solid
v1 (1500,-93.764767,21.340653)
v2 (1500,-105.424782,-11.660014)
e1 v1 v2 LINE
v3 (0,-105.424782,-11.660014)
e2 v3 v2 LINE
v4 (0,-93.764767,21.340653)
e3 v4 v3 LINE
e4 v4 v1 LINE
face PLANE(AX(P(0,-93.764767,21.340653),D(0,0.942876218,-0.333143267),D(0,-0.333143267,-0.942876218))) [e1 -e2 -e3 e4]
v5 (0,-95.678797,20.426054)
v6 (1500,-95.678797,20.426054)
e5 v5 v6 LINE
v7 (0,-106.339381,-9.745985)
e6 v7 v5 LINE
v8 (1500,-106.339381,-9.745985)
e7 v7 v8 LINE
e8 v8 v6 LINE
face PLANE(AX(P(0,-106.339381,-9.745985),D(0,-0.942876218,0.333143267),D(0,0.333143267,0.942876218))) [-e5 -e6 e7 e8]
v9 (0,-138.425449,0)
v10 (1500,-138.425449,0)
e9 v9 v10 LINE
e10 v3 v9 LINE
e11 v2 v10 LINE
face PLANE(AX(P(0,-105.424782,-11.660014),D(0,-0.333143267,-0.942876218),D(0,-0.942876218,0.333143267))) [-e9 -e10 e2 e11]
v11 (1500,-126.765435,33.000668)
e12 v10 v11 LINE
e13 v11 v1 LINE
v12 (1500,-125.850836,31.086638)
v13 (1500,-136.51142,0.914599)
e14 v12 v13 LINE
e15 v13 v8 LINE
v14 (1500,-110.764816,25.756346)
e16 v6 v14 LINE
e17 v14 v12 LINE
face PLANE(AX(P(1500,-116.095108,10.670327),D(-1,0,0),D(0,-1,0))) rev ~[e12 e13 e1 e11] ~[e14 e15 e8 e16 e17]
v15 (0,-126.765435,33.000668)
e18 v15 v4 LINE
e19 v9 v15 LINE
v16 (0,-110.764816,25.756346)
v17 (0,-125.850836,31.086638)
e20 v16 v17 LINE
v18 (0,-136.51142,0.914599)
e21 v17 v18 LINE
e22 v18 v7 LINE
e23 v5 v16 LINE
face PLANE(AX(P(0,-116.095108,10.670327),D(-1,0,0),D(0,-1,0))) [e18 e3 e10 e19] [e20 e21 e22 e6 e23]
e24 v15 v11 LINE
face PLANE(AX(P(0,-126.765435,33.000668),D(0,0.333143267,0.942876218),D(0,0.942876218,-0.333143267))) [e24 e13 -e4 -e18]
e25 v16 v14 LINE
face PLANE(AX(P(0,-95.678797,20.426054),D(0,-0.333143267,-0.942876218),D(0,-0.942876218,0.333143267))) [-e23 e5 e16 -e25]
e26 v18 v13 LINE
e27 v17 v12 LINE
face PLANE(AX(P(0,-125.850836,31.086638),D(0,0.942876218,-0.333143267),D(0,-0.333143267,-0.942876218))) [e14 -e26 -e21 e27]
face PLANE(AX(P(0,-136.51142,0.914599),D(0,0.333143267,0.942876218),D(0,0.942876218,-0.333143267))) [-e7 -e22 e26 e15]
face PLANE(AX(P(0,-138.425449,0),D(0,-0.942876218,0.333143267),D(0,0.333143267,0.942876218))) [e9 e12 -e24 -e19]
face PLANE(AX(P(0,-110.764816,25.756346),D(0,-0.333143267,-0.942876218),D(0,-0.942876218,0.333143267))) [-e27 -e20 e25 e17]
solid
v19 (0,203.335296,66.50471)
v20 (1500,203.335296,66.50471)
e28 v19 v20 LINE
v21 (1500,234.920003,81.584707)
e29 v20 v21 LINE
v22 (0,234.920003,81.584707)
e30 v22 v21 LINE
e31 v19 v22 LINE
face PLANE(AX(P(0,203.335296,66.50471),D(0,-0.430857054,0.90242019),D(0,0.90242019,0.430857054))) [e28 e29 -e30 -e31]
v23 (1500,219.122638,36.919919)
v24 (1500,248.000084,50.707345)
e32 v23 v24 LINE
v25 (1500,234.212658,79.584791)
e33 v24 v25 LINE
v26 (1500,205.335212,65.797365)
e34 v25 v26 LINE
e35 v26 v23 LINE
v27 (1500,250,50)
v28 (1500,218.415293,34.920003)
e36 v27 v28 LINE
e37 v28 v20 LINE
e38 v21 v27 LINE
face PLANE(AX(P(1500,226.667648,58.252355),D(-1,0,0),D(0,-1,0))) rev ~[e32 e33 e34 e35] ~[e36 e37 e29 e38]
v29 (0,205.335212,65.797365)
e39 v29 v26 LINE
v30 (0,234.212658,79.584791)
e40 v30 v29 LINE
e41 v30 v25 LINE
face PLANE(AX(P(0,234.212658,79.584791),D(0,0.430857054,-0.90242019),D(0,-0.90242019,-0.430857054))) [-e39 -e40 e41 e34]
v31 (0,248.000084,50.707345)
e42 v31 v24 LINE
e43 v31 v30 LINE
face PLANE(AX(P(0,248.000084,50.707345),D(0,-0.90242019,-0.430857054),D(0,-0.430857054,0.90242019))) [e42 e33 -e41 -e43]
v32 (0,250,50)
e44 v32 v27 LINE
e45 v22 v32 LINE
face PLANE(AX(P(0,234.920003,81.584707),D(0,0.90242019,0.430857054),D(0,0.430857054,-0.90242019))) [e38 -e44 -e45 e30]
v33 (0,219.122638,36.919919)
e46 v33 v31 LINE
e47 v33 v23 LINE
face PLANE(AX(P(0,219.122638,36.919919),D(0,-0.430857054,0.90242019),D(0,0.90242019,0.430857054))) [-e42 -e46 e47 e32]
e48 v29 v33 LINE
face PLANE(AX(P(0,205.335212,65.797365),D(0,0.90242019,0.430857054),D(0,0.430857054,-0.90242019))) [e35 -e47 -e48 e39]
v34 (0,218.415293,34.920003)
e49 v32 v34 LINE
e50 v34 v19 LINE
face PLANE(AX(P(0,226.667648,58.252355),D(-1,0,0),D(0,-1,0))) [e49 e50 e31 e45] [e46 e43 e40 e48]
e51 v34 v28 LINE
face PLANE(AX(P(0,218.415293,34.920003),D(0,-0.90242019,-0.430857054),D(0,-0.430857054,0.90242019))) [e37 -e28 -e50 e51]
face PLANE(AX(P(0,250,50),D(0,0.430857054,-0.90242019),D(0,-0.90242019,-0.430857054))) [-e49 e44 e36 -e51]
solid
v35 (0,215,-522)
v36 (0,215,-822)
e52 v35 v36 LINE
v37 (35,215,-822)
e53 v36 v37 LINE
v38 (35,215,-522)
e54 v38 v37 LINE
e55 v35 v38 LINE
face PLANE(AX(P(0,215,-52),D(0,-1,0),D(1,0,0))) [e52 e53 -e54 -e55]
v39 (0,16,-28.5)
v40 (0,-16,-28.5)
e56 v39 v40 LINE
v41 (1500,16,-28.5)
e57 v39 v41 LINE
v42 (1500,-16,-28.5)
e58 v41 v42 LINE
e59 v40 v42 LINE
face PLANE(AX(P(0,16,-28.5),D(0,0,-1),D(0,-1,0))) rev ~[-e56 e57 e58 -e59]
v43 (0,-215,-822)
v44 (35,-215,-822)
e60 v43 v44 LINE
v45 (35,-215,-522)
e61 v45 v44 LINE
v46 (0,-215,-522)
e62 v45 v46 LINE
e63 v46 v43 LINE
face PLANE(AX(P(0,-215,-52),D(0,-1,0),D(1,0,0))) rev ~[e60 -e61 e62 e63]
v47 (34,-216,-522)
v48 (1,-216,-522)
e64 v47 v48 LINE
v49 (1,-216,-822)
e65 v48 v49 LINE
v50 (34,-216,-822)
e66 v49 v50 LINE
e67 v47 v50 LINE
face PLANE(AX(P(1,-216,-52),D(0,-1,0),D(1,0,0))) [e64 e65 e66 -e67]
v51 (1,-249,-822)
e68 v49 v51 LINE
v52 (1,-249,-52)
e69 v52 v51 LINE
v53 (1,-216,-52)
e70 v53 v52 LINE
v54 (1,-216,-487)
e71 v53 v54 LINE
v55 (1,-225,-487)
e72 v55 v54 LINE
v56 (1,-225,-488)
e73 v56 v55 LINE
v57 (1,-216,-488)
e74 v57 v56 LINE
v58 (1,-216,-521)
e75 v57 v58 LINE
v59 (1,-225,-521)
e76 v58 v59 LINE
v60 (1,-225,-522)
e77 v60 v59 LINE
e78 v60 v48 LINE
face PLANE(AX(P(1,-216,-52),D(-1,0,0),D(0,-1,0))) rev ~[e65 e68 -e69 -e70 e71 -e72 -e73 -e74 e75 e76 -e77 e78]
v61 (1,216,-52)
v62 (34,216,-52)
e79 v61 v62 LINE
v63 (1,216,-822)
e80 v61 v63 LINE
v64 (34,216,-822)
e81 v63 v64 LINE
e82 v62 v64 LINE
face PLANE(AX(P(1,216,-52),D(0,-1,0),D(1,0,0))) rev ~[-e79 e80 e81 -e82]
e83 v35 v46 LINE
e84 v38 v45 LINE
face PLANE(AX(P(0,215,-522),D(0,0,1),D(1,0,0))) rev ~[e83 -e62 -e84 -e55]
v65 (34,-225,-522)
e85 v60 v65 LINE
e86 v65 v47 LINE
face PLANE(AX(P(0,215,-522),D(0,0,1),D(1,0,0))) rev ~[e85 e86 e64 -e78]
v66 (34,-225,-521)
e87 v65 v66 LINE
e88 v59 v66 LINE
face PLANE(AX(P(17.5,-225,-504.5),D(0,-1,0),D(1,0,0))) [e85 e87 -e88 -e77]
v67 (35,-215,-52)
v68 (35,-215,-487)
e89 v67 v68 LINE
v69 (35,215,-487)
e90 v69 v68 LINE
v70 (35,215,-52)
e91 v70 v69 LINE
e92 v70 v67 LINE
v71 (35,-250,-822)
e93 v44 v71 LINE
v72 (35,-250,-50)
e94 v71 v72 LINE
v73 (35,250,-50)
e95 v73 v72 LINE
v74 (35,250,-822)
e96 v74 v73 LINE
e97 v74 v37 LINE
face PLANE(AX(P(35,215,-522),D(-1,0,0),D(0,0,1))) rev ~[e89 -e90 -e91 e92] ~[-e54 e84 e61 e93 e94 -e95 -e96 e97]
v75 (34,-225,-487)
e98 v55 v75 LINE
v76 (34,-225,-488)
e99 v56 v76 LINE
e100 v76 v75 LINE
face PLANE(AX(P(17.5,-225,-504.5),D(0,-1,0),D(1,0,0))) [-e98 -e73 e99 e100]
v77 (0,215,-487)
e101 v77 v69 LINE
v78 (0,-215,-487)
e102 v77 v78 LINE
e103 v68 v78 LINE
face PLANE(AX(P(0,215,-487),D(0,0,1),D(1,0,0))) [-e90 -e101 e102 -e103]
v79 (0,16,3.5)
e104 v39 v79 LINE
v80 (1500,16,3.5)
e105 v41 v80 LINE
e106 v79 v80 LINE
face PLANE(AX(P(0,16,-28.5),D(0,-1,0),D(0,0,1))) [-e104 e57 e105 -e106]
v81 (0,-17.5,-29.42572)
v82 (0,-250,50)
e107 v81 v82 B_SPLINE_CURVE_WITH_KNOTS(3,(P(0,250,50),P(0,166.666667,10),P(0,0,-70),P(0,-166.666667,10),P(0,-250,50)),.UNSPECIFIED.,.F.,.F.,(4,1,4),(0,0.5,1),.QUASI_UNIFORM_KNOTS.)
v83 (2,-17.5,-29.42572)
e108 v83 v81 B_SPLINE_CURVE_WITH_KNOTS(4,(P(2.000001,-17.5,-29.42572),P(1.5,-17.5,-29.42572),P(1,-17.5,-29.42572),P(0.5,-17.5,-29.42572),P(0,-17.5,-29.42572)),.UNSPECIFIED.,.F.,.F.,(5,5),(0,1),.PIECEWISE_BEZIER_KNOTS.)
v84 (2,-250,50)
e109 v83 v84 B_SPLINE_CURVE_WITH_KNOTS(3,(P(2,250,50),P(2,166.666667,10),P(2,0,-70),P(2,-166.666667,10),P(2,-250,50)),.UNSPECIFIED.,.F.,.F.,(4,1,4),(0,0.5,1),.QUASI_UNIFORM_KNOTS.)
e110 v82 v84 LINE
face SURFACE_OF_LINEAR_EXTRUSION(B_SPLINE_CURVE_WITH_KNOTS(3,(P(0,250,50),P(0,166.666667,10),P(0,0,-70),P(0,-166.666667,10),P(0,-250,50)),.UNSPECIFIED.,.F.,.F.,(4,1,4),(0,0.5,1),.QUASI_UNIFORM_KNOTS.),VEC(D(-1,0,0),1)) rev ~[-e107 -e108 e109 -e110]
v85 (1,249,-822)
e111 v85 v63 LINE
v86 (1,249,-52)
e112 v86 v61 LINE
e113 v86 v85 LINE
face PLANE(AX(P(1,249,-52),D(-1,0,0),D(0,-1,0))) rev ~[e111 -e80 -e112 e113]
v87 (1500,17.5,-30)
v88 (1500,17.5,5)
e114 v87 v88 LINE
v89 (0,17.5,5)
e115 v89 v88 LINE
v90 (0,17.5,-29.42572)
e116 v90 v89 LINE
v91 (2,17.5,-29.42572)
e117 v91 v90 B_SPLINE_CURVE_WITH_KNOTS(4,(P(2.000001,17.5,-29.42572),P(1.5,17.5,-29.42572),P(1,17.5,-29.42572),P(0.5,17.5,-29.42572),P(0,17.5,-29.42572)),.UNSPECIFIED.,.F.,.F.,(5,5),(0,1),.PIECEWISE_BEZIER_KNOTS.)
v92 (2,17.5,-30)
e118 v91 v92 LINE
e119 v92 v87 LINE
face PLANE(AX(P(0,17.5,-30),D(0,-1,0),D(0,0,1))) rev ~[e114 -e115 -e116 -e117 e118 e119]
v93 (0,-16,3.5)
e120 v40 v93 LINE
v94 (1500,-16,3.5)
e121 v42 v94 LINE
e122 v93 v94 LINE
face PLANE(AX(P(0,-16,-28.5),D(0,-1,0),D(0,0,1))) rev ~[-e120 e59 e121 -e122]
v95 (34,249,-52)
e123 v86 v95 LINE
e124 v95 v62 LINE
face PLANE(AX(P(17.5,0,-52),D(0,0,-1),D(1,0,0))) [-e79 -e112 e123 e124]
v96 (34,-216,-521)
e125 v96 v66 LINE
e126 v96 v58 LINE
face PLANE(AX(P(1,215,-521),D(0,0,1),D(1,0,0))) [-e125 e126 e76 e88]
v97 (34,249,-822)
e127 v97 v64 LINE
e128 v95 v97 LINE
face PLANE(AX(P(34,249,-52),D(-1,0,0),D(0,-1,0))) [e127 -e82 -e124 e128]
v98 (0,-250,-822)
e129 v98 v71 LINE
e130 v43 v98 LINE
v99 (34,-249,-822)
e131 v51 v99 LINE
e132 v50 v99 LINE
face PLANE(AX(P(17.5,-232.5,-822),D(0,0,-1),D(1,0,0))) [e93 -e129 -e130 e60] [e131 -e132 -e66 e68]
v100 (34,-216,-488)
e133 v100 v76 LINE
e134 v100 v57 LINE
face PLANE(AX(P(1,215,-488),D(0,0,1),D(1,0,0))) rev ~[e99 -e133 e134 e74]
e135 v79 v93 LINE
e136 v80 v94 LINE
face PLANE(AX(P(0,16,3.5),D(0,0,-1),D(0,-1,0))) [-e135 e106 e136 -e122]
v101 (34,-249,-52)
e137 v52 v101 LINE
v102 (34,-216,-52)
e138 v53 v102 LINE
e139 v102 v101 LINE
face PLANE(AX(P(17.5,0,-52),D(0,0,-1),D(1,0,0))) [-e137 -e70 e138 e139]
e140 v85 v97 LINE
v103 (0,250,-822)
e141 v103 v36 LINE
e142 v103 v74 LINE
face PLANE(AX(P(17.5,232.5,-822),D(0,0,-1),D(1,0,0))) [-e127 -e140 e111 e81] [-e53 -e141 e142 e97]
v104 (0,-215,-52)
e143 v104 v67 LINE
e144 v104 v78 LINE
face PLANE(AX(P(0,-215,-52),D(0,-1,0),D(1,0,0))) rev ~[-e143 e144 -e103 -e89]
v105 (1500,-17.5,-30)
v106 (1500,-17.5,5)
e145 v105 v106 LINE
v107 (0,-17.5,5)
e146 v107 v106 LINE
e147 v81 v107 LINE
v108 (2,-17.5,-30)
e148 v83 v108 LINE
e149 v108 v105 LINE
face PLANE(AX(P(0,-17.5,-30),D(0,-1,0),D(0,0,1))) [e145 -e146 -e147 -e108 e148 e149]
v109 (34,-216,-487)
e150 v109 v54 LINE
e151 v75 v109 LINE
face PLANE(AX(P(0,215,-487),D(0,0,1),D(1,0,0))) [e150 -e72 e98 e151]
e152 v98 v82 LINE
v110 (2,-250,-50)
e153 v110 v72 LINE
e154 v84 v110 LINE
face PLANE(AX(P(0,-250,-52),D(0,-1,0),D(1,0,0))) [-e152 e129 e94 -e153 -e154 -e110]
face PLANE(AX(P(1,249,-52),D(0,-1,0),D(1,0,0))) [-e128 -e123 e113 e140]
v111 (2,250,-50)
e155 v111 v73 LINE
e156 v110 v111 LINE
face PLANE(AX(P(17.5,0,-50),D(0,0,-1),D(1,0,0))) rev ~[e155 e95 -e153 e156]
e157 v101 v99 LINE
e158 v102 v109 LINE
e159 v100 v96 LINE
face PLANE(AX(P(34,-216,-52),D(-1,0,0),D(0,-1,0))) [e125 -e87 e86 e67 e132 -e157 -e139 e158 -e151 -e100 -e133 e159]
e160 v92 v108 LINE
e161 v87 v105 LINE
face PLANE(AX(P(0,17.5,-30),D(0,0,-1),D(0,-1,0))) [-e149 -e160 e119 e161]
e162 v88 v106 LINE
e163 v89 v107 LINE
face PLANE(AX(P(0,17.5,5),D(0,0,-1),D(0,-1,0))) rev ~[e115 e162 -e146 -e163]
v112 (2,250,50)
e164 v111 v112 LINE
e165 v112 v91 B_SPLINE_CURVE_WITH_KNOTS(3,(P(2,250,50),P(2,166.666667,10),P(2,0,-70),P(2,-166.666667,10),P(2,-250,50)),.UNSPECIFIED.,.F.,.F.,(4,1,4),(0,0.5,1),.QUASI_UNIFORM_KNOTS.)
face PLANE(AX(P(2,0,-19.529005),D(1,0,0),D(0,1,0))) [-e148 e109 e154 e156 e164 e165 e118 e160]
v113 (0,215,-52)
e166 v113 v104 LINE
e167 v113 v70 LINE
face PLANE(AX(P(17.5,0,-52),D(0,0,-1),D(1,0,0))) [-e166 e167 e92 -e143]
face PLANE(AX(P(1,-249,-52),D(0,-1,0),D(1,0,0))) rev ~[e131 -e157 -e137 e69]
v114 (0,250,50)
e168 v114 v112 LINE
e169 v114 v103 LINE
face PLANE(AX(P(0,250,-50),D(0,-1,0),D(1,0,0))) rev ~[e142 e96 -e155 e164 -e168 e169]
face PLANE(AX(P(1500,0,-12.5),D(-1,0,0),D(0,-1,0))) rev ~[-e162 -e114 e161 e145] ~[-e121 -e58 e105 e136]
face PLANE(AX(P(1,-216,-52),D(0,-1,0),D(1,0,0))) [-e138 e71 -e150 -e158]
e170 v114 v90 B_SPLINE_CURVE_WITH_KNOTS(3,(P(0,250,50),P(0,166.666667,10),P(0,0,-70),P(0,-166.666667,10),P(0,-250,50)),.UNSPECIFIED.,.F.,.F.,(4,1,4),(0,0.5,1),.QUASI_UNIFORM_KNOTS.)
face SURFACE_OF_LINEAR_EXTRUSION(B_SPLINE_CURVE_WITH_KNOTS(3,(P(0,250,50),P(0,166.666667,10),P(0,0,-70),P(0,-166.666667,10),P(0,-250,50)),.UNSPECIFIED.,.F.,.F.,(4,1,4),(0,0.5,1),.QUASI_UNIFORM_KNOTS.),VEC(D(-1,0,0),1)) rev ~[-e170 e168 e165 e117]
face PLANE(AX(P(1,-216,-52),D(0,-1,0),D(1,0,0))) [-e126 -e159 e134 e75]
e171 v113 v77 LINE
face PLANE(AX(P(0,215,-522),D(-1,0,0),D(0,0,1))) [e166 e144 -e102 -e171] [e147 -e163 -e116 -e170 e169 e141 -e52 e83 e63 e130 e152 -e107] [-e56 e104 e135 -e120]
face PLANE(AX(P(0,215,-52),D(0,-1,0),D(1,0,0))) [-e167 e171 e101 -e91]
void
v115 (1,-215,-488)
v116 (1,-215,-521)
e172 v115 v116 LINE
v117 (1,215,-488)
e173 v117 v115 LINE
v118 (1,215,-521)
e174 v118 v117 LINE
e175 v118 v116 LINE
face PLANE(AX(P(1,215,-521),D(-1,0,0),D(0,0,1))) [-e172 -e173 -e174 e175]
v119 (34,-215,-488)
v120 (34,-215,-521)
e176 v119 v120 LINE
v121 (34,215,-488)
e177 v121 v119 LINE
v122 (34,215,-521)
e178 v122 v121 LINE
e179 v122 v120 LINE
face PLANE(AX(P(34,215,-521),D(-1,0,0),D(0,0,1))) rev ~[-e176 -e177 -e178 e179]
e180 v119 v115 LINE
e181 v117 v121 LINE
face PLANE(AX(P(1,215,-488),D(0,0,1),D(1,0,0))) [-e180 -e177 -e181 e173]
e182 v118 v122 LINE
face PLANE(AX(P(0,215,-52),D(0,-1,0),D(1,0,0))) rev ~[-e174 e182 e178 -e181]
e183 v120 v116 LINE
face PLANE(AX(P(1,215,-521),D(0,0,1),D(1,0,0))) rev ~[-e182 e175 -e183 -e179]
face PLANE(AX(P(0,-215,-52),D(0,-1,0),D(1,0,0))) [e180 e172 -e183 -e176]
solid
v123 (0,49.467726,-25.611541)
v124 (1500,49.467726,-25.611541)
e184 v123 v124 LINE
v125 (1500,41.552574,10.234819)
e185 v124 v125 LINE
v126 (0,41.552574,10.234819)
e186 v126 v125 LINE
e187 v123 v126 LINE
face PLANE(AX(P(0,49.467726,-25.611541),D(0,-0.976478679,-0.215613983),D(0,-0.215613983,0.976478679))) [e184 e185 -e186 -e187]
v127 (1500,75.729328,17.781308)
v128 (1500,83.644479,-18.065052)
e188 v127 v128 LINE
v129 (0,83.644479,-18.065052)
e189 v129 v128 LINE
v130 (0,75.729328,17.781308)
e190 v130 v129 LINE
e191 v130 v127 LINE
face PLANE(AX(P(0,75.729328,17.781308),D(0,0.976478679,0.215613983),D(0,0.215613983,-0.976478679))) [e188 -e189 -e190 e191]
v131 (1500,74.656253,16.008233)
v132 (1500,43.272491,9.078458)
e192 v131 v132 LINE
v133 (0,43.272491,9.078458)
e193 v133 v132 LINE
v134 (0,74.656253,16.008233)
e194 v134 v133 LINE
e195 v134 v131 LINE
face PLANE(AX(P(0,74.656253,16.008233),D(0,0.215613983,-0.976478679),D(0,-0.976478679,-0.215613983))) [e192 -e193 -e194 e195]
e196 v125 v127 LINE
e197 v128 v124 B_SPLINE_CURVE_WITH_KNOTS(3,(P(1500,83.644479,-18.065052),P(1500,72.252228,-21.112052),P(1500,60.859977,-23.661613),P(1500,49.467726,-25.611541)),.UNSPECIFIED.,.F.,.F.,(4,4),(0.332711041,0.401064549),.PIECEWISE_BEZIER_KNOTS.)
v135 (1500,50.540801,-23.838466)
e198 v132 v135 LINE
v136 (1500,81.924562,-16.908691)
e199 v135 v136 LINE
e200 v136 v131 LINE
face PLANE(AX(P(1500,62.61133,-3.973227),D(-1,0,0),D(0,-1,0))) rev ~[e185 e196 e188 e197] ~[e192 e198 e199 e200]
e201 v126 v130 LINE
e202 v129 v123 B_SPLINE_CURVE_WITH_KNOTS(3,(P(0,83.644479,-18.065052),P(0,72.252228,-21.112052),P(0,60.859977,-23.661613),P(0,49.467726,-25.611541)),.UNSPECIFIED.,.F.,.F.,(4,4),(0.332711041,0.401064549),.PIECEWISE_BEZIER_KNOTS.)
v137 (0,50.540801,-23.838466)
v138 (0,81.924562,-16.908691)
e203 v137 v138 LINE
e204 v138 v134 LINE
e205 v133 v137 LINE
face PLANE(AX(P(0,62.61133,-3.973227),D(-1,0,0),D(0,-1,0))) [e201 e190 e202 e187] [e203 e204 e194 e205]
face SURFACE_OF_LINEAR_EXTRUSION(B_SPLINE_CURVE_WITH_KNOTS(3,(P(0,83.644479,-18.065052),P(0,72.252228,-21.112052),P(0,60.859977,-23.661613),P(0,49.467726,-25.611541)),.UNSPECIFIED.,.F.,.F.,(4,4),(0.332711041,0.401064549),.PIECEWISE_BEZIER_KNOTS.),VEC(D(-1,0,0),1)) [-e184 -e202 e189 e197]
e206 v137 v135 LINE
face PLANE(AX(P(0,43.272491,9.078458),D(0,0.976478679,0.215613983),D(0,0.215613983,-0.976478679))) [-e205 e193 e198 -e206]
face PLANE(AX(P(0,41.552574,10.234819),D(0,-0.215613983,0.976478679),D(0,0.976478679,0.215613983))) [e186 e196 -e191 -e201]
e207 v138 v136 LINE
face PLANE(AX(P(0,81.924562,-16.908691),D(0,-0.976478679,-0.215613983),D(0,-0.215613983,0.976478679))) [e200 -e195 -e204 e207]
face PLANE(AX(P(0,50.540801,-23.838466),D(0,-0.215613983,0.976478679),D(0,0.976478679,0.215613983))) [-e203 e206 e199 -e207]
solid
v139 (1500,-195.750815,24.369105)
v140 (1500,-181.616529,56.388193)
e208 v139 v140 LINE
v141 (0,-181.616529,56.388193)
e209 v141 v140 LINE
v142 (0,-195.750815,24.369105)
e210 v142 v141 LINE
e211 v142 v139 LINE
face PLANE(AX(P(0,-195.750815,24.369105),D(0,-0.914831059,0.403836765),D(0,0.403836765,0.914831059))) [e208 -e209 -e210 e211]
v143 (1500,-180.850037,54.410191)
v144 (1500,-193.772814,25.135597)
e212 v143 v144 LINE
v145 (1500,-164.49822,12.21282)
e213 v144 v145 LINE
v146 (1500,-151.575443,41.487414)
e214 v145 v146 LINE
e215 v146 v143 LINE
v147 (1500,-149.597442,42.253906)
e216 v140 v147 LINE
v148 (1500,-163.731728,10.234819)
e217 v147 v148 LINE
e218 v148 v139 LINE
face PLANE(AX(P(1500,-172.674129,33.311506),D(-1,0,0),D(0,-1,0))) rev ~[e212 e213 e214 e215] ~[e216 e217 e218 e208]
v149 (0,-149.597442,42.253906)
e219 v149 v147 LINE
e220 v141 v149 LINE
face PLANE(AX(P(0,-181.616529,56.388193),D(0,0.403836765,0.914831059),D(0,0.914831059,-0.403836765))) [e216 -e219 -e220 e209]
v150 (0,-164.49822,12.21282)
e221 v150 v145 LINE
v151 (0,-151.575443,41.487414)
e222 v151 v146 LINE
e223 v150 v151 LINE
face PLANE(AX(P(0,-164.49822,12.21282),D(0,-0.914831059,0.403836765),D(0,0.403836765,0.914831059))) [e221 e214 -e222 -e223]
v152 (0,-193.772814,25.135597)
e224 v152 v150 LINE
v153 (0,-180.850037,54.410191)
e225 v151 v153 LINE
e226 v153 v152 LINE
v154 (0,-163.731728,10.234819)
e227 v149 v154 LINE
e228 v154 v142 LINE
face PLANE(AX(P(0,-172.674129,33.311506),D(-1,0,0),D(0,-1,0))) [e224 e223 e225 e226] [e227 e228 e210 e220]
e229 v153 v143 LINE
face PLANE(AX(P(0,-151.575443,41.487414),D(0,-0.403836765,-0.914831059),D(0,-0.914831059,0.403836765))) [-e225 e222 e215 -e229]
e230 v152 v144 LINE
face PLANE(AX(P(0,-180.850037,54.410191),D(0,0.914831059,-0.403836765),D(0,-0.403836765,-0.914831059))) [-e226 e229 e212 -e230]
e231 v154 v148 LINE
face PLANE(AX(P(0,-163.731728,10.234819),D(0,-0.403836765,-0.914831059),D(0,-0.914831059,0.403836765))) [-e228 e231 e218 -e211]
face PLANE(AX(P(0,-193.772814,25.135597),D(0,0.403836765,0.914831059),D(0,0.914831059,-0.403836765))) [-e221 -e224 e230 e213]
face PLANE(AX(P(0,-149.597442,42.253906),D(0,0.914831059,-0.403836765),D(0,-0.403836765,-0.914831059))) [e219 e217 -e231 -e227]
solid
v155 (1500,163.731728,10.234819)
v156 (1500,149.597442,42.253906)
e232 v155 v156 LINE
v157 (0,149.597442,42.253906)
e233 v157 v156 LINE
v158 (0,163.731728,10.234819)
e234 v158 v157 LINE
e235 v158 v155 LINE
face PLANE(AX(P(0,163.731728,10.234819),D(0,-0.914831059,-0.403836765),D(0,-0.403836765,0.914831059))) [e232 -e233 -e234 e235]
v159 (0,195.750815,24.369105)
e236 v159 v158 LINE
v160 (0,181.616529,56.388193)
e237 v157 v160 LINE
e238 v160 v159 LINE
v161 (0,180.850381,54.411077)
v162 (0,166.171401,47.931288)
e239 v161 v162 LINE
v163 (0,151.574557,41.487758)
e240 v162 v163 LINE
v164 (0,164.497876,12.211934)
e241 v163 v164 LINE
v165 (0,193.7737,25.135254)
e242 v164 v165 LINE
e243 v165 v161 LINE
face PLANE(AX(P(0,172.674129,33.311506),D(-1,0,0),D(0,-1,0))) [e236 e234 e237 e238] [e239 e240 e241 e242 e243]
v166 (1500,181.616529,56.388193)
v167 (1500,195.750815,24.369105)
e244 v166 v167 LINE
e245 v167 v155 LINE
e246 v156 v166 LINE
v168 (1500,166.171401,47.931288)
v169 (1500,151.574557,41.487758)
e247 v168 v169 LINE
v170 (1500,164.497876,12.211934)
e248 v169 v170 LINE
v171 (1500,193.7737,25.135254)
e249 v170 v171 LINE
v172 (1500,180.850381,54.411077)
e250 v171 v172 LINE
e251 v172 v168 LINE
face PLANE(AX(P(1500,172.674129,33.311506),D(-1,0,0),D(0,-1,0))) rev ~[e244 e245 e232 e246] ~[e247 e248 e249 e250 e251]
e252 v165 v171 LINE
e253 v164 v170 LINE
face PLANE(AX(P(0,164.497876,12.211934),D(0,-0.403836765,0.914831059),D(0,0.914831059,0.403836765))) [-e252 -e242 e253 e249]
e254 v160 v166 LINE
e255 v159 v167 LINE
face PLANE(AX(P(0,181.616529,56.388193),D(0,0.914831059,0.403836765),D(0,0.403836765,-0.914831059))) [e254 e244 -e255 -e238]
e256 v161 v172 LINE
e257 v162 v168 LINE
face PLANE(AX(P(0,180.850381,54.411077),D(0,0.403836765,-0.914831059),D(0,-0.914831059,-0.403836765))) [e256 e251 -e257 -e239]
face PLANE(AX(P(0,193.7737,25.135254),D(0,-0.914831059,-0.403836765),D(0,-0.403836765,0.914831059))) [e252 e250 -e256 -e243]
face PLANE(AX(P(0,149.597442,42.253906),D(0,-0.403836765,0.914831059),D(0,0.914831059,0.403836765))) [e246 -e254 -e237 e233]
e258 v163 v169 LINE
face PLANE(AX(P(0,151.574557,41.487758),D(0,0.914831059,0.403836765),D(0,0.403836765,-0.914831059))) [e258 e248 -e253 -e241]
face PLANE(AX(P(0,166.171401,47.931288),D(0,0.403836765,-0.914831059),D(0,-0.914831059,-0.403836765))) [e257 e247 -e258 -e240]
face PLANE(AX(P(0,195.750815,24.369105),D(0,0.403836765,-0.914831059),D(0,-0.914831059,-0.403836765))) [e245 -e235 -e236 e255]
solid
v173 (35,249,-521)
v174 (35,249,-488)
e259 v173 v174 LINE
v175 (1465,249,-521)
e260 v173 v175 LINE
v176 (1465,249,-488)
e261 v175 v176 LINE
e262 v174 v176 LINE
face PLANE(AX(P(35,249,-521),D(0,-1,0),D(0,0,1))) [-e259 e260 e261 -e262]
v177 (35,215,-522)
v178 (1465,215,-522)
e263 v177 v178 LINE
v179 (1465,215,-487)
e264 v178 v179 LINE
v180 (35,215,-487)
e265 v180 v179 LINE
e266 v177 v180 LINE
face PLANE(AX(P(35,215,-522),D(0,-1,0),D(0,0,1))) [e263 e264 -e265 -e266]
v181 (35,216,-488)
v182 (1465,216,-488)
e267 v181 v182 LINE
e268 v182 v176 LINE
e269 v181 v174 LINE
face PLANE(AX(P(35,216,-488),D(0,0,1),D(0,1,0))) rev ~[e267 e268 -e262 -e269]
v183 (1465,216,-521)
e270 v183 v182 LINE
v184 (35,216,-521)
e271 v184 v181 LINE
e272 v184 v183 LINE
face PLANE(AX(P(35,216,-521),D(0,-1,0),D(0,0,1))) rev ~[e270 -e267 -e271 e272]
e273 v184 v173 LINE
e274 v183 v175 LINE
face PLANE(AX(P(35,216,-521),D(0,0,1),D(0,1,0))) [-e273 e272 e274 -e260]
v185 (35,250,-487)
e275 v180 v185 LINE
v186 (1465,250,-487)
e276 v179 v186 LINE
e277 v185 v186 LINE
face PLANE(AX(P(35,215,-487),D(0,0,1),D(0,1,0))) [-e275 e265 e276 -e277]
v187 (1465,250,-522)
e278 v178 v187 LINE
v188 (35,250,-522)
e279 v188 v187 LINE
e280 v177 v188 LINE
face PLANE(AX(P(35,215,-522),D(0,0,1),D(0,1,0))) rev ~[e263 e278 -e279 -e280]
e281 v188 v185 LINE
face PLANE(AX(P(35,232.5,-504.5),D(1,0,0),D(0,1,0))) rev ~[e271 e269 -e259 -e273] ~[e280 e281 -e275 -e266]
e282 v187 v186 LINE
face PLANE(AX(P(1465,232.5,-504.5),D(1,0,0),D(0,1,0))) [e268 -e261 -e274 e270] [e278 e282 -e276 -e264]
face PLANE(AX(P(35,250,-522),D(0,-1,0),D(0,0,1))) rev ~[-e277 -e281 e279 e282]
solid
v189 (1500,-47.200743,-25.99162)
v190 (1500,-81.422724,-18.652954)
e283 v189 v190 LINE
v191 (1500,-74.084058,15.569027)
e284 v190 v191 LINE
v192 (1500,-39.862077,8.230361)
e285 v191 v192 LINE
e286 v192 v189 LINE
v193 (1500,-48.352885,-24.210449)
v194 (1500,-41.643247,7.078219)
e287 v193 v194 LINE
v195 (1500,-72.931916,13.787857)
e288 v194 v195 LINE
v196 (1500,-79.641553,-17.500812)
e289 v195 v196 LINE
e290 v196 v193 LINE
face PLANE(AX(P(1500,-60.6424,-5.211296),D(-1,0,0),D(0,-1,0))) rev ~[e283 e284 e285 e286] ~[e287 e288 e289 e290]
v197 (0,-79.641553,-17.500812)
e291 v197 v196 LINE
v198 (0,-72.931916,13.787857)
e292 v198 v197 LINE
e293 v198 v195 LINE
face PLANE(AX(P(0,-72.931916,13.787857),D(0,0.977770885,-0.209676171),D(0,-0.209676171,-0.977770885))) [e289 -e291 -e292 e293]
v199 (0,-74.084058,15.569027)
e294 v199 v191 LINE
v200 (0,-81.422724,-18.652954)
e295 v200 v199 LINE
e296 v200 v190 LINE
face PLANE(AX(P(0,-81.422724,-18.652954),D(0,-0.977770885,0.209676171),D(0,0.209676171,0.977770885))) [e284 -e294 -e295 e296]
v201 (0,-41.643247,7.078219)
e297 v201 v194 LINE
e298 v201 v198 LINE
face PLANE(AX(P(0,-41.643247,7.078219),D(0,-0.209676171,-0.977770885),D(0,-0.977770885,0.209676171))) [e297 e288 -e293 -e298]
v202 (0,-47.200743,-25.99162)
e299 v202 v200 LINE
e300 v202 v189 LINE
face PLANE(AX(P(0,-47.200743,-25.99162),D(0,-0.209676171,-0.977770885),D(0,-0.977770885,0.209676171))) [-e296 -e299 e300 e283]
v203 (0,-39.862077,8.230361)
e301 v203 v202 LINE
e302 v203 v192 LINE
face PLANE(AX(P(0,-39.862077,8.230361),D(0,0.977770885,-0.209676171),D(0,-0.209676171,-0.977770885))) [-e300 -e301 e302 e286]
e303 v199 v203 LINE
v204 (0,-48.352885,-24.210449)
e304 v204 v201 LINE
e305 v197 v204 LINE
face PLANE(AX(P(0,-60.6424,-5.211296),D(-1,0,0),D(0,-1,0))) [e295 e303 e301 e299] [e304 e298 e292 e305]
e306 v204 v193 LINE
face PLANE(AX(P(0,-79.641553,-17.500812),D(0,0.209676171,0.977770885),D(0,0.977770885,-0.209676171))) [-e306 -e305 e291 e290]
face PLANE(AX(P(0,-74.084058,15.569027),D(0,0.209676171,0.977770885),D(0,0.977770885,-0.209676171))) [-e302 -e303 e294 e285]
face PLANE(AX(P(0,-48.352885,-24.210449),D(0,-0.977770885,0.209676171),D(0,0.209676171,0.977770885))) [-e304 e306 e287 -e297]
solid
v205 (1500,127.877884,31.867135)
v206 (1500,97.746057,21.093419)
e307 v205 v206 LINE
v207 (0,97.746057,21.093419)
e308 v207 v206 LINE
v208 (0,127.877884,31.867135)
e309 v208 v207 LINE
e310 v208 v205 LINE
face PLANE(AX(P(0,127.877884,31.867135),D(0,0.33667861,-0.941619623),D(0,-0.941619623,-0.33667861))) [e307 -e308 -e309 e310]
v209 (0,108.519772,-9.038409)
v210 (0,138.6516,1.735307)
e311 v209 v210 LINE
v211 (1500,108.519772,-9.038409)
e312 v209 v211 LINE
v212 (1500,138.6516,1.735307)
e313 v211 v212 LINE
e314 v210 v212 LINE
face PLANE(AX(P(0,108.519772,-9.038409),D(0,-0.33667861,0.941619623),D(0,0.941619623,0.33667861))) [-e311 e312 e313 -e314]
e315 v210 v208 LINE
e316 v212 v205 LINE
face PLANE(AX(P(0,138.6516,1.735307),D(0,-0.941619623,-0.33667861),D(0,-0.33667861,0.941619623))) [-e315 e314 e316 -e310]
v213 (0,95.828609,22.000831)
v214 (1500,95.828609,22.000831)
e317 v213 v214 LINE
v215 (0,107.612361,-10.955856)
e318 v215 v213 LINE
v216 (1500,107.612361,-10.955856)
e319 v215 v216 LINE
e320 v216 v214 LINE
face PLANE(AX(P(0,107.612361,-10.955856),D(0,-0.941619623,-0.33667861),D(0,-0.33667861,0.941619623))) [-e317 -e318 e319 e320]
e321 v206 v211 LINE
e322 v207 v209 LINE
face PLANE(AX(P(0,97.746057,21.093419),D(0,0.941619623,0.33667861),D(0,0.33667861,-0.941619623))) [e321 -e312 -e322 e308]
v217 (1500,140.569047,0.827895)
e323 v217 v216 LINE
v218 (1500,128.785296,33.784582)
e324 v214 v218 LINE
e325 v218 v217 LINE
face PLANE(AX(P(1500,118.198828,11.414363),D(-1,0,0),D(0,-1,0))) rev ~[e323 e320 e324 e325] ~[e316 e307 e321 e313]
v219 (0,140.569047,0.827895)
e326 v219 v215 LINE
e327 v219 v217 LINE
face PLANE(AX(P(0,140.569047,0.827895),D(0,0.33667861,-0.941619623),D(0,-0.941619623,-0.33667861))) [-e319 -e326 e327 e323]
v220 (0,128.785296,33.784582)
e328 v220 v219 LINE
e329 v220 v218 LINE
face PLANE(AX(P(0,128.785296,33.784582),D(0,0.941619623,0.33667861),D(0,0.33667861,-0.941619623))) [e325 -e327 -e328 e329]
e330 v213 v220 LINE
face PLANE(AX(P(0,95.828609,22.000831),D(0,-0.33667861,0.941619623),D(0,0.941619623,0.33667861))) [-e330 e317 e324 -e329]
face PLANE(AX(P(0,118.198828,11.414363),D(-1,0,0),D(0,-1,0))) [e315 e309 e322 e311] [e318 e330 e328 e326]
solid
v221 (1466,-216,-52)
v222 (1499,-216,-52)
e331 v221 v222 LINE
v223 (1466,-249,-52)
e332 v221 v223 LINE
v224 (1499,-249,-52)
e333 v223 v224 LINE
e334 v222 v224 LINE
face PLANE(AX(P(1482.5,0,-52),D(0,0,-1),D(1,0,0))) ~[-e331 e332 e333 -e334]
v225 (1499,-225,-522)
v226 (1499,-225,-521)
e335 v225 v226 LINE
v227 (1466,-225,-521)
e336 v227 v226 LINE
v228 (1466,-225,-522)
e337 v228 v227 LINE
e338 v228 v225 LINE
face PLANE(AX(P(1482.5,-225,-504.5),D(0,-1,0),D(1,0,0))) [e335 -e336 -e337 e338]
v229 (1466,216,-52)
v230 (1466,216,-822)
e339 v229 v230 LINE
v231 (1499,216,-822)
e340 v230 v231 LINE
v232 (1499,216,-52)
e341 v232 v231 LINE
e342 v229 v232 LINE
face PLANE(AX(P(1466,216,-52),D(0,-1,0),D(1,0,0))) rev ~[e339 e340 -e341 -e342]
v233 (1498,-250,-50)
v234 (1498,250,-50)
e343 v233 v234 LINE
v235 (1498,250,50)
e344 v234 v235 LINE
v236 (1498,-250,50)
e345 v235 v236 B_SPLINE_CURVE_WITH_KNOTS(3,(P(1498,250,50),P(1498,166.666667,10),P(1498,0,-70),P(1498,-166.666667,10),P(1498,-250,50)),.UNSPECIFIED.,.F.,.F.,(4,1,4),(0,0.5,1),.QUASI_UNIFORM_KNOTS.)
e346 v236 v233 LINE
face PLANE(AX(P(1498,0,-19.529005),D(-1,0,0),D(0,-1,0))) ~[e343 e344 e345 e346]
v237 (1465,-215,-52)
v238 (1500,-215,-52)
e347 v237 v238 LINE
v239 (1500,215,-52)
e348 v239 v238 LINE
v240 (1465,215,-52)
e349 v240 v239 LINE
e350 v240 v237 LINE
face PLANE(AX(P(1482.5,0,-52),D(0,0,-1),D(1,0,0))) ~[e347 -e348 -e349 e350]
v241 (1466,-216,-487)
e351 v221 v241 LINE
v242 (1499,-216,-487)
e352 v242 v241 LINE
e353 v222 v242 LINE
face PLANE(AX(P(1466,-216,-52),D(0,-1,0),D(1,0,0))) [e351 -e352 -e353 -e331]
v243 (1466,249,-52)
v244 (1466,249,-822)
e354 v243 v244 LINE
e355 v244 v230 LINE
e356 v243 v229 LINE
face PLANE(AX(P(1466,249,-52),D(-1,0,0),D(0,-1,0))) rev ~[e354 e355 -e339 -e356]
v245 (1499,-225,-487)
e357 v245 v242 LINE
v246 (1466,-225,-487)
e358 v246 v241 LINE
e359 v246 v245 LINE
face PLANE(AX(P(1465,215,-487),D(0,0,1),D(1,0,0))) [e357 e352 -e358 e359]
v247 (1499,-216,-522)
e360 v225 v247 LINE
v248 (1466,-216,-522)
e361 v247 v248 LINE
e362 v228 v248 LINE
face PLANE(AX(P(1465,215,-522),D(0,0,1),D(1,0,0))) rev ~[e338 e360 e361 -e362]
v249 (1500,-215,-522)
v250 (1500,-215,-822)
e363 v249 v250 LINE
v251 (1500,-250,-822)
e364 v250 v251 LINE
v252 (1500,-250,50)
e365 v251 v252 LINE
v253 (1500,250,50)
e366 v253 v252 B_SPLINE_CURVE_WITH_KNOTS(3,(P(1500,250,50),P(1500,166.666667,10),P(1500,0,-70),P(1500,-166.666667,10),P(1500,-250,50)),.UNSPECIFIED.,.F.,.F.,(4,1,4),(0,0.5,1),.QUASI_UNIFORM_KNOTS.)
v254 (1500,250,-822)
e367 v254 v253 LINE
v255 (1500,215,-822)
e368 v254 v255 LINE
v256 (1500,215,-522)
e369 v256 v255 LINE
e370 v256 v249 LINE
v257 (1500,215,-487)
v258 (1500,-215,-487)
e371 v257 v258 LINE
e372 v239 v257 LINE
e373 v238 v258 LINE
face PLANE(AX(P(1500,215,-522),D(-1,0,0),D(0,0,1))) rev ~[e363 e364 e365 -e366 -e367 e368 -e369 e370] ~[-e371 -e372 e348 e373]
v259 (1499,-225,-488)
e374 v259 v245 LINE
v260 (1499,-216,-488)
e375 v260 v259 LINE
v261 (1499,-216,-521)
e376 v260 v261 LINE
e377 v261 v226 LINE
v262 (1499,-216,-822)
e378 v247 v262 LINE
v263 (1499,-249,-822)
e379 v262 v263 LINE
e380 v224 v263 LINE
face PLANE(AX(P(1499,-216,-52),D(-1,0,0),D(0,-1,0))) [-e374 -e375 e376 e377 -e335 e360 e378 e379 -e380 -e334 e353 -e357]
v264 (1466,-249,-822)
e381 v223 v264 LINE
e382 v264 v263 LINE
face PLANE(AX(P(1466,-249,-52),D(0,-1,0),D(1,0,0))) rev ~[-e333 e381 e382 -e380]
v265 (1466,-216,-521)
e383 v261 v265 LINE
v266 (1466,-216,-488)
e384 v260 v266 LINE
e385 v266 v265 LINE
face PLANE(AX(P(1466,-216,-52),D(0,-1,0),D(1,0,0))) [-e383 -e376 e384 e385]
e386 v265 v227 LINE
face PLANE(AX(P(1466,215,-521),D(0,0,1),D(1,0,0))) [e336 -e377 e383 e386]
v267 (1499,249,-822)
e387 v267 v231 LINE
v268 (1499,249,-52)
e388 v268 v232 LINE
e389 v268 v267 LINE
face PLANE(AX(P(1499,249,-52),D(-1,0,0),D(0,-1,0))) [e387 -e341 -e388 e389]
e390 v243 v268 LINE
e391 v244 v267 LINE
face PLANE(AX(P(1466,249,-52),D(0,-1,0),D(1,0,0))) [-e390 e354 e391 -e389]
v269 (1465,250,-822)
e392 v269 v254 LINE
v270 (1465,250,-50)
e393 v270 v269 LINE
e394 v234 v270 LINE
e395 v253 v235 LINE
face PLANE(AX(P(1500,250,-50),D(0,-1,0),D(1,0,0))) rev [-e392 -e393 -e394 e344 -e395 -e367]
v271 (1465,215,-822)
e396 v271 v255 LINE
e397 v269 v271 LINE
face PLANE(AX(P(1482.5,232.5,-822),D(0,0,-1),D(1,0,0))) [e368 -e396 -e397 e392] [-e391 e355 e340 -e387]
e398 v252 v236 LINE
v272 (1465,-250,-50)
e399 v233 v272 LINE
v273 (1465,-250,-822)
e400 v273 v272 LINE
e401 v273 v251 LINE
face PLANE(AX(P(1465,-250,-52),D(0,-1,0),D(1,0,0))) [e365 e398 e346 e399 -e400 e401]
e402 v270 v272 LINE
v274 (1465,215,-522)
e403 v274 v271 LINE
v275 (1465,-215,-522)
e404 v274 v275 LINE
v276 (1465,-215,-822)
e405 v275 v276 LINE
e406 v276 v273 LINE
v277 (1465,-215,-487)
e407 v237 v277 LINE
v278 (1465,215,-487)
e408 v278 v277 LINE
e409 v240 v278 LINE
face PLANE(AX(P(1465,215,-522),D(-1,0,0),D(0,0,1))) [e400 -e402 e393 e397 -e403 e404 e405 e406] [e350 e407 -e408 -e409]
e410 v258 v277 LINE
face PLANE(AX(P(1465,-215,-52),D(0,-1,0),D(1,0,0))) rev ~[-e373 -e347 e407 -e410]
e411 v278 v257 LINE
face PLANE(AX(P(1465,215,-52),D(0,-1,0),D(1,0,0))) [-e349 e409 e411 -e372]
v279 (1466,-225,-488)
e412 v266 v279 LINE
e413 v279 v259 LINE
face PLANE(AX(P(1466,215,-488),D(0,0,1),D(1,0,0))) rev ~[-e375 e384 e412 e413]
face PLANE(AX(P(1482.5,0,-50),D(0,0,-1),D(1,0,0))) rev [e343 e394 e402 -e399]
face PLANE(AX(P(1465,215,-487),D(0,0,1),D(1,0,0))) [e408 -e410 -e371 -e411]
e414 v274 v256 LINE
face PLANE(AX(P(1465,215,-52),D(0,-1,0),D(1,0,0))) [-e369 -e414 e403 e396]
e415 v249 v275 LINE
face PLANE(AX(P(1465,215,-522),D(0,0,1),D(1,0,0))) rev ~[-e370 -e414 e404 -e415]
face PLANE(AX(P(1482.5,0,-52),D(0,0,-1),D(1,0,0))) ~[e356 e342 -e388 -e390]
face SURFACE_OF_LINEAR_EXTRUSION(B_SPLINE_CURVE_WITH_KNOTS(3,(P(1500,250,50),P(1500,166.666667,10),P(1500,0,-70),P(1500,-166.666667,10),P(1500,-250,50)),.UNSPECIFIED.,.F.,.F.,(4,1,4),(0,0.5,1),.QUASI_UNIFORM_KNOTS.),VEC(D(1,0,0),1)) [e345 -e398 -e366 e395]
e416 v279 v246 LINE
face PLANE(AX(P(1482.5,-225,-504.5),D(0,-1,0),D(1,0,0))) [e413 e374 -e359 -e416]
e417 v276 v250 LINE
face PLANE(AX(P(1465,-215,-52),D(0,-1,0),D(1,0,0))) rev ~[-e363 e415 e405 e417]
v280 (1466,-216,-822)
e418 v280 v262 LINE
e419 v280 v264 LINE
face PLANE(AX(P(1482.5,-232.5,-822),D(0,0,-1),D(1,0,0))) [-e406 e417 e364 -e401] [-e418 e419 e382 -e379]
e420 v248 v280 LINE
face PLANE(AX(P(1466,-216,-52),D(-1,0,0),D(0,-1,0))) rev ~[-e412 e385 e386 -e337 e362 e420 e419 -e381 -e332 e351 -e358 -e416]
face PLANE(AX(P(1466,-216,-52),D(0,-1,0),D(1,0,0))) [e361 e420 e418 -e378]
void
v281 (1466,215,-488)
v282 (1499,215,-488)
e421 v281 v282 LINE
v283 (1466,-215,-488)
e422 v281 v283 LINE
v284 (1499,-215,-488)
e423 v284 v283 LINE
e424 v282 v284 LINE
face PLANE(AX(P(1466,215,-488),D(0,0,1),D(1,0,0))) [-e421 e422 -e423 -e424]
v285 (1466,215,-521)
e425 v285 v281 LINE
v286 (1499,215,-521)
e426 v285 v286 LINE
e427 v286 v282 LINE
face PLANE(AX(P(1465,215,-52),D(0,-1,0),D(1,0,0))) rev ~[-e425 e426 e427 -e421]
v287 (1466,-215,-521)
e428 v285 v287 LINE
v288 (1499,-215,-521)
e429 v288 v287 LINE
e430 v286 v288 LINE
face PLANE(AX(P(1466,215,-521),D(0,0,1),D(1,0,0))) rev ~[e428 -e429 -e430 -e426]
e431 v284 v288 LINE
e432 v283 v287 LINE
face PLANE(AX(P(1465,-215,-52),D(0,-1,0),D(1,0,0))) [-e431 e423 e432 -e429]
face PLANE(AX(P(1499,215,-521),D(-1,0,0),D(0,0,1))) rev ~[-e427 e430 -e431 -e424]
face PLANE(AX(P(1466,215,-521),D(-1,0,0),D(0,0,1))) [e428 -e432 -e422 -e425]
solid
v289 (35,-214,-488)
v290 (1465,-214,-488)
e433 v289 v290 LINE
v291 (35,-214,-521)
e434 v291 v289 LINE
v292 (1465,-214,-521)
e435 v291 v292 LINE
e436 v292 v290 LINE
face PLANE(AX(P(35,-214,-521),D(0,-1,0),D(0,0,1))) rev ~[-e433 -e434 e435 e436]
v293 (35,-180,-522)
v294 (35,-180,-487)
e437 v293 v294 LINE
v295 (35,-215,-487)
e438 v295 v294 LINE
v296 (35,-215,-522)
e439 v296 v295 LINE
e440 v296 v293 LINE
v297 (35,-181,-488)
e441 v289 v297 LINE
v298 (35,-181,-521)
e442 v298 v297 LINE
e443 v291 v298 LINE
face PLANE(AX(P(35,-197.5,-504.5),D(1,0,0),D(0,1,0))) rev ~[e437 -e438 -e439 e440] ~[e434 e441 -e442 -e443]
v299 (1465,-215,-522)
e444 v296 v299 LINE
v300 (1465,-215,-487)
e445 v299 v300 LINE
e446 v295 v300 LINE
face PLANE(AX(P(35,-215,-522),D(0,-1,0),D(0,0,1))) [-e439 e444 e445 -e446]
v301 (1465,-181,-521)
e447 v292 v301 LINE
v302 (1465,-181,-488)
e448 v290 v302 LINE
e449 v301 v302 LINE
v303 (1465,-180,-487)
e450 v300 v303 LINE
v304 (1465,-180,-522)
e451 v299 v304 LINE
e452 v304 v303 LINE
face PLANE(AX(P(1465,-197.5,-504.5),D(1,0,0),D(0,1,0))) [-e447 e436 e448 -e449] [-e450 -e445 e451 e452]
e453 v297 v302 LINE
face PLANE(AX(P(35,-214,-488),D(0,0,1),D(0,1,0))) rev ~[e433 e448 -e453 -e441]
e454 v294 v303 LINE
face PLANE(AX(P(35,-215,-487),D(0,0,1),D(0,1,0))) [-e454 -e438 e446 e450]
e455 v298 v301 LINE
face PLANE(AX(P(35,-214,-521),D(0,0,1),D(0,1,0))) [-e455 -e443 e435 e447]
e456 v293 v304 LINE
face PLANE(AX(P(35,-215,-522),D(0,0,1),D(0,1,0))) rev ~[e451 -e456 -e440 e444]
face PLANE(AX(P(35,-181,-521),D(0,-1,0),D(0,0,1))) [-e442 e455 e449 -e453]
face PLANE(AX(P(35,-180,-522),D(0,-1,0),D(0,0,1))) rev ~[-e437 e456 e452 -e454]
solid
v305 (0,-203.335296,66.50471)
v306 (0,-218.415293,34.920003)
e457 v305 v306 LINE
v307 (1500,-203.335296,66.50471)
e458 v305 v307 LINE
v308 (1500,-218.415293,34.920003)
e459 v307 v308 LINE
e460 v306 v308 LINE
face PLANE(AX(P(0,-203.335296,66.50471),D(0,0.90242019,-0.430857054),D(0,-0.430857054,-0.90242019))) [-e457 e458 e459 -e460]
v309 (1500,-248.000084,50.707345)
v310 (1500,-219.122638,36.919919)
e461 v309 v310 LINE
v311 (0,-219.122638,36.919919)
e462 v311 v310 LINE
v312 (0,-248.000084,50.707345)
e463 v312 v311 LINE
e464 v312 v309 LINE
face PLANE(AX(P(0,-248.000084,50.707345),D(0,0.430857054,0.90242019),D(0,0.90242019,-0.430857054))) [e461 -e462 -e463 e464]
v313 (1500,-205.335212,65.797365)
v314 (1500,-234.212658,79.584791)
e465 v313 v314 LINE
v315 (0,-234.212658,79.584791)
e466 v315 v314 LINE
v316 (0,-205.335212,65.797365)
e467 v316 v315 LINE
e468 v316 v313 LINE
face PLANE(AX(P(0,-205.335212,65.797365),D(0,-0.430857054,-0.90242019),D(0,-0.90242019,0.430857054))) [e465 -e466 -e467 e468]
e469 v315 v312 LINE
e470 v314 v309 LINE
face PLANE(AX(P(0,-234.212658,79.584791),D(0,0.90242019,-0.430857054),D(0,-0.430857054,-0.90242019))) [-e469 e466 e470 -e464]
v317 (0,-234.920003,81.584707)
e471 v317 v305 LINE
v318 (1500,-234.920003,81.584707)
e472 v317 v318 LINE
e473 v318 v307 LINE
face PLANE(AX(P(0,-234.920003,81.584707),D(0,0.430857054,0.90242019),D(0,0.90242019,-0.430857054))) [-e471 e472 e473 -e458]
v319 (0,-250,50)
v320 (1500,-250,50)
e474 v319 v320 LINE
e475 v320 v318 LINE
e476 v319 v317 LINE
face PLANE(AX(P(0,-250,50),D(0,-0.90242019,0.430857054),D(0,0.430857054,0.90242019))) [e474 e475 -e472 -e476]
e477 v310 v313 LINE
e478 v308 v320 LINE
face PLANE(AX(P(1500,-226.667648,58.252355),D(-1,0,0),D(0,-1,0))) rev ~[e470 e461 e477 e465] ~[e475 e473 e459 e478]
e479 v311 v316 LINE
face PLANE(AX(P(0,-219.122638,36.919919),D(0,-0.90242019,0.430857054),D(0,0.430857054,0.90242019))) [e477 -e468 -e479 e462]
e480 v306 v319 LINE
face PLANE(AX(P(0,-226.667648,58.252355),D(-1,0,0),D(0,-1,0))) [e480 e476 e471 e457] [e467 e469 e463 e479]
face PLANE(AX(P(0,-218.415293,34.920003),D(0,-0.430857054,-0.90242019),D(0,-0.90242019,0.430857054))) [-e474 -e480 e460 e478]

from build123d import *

# Parameters (mm, degrees)
F1_DEPTH  = 2
F2_W      = 35
F2_H      = 500
F3_DEPTH  = 2
F6_W      = 35
F6_H      = 35
F6_W_2    = 32
F6_H_2    = 32
F7_DEPTH  = 1500
F9_DEPTH  = 1500
F11_DEPTH = 1500
F13_DEPTH = 1500
F14_W     = 35
F14_H     = 35
F14_W_2   = 33
F14_H_2   = 33
F15_DEPTH = 770
F16_W     = 35
F16_H     = 35
F16_W_2   = 33
F16_H_2   = 33
F17_DEPTH = 770
F18_W     = 35
F18_H     = 35
F18_W_2   = 33
F18_H_2   = 33
F19_DEPTH = 440
F20_W     = 35
F20_H     = 35
F20_W_2   = 33
F20_H_2   = 33
F21_DEPTH = 440
F22_W     = 35
F22_H     = 35
F22_W_2   = 33
F22_H_2   = 33
F23_DEPTH = 1430
F24_W     = 35
F24_H     = 35
F24_W_2   = 33
F24_H_2   = 33
F25_DEPTH = 1430


with BuildPart() as f1:
    # F0 (on Right) → F1 (new body)
    with BuildSketch(Plane.YZ):
        with BuildLine():
            Line((-250, 50), (-250, -50))
            Line((-250, -50), (250, -50))
            Line((250, -50), (250, 50))
            add(Edge.make_bspline(
                [(250, 50), (166.6666666667, 10), (0, -70), (-166.6666666667, 10), (-250, 50)],
                knots=[0, 0, 0, 0, 0.5, 1, 1, 1, 1], degree=3))
        make_face()
    extrude(amount=F1_DEPTH)

    # F2 (on face) → F3 (join)
    with BuildSketch(Plane(origin=(0, 0, -50), x_dir=(1, 0, 0), z_dir=(0, 0, -1))):
        with Locations((17.5, 0)):
            Rectangle(F2_W, F2_H)
    extrude(amount=F3_DEPTH)


with BuildPart() as f4_1:
    # F4: instance of F1
    add(f1.part.mirror(Plane(origin=(35, 0, -51), x_dir=(0, 1, 0), z_dir=(1, 0, 0))))


with BuildPart() as f4_1_1:
    # F5: moved
    add(f4_1.part.moved(Location((1430, 0, 0))))

    # F16 (on face) → F17 (join)
    with BuildSketch(Plane(origin=(0, 0, -52), x_dir=(1, 0, 0), z_dir=(0, 0, -1))):
        with Locations((1482.5, 232.5)):
            Rectangle(F16_W, F16_H)
        with Locations((1482.5, 232.5)):
            Rectangle(F16_W_2, F16_H_2, mode=Mode.SUBTRACT)
        with Locations((1482.5, -232.5)):
            Rectangle(F16_W, F16_H)
        with Locations((1482.5, -232.5)):
            Rectangle(F16_W_2, F16_H_2, mode=Mode.SUBTRACT)
    extrude(amount=F17_DEPTH)

    # F18 (on face) → F19 (join)
    with BuildSketch(Plane.XZ.offset(-215)):
        with Locations((1482.5, -504.5)):
            Rectangle(F18_W, F18_H)
        with Locations((1482.5, -504.5)):
            Rectangle(F18_W_2, F18_H_2, mode=Mode.SUBTRACT)
    extrude(amount=F19_DEPTH)


with BuildPart() as f1_1:
    add(f1.part)

    # F6 (on face) → F7 (join)
    with BuildSketch(Plane(origin=(0, 0, 0), x_dir=(0, -1, 0), z_dir=(-1, 0, 0))):
        with Locations((0, -12.5)):
            Rectangle(F6_W, F6_H)
        with Locations((0, -12.5)):
            Rectangle(F6_W_2, F6_H_2, mode=Mode.SUBTRACT)
    extrude(amount=-F7_DEPTH)

    # F14 (on face) → F15 (join)
    with BuildSketch(Plane(origin=(0, 0, -52), x_dir=(1, 0, 0), z_dir=(0, 0, -1))):
        with Locations((17.5, 232.5)):
            Rectangle(F14_W, F14_H)
        with Locations((17.5, 232.5)):
            Rectangle(F14_W_2, F14_H_2, mode=Mode.SUBTRACT)
        with Locations((17.5, -232.5)):
            Rectangle(F14_W, F14_H)
        with Locations((17.5, -232.5)):
            Rectangle(F14_W_2, F14_H_2, mode=Mode.SUBTRACT)
    extrude(amount=F15_DEPTH)

    # F20 (on face) → F21 (join)
    with BuildSketch(Plane.XZ.offset(-215)):
        with Locations((17.5, -504.5)):
            Rectangle(F20_W, F20_H)
        with Locations((17.5, -504.5)):
            Rectangle(F20_W_2, F20_H_2, mode=Mode.SUBTRACT)
    extrude(amount=F21_DEPTH)


with BuildPart() as f9:
    # F8 (on face) → F9 (new body)
    with BuildSketch(Plane(origin=(0, 0, 0), x_dir=(0, -1, 0), z_dir=(-1, 0, 0))):
        Polygon((-234.9200030965, 81.5847066377), (-250, 50), (-218.4152933623, 34.9200030965), (-203.3352964588, 66.5047097342), align=None)
        Polygon((-234.2126583936, 79.5847907717), (-219.7739353592, 72.6910779015), (-205.3352123248, 65.7973650313), (-219.1226380652, 36.9199189626), (-248.0000841339, 50.7073447029), align=None, mode=Mode.SUBTRACT)
    extrude(amount=-F9_DEPTH)


with BuildPart() as f11:
    # F10 (on face) → F11 (new body)
    with BuildSketch(Plane(origin=(0, 0, 0), x_dir=(0, -1, 0), z_dir=(-1, 0, 0))):
        with BuildLine():
            add(Edge.make_bspline(
                [(-83.6444792813, -18.0650520534), (-72.2522280284, -21.1120515617), (-60.8599767755, -23.6616132493), (-49.4677255225, -25.6115414701)],
                knots=[0.3327110414, 0.3327110414, 0.3327110414, 0.3327110414, 0.401064549, 0.401064549, 0.401064549, 0.401064549], degree=3))
            Line((-49.4677255225, -25.6115414701), (-41.5525741961, 10.2348187258))
            Line((-41.5525741961, 10.2348187258), (-75.7293279548, 17.7813081425))
            Line((-75.7293279548, 17.7813081425), (-83.6444792813, -18.0650520534))
        make_face()
        Polygon((-74.6562526953, 16.0082330425), (-58.9643720505, 12.5433454159), (-43.2724914057, 9.0784577893), (-50.5408007821, -23.8384663701), (-81.9245620717, -16.9086911169), align=None, mode=Mode.SUBTRACT)
    extrude(amount=-F11_DEPTH)


with BuildPart() as f11b:
    # F10 (on face) → F11, piece 2 (new body)
    with BuildSketch(Plane(origin=(0, 0, 0), x_dir=(0, -1, 0), z_dir=(-1, 0, 0))):
        Polygon((-140.569047312, 0.8278953682), (-107.6123605236, -10.955855984), (-95.8286091714, 22.0008308044), (-128.7852959598, 33.7845821566), align=None)
        Polygon((-127.8778844411, 31.8671348077), (-112.8119704807, 26.4802770467), (-97.7460565203, 21.0934192857), (-108.5197720423, -9.0384086351), (-138.6515999631, 1.7353068869), align=None, mode=Mode.SUBTRACT)
    extrude(amount=-F11_DEPTH)


with BuildPart() as f11c:
    # F10 (on face) → F11, piece 3 (new body)
    with BuildSketch(Plane(origin=(0, 0, 0), x_dir=(0, -1, 0), z_dir=(-1, 0, 0))):
        Polygon((-195.7508154323, 24.3691054968), (-163.7317283517, 10.2348187258), (-149.5974415807, 42.2539058064), (-181.6165286613, 56.3881925774), align=None)
        Polygon((-180.8503805606, 54.4110768645), (-166.1714005224, 47.9312883295), (-151.5745572935, 41.4877577057), (-164.4978764523, 12.2119344387), (-193.7736997194, 25.1352535974), align=None, mode=Mode.SUBTRACT)
    extrude(amount=-F11_DEPTH)


with BuildPart() as f13:
    # F12 (on face) → F13 (new body)
    with BuildSketch(Plane(origin=(0, 0, 0), x_dir=(0, -1, 0), z_dir=(-1, 0, 0))):
        Polygon((218.4152933623, 34.9200030965), (250, 50), (234.9200030965, 81.5847066377), (203.3352964588, 66.5047097342), align=None)
        Polygon((205.3352123248, 65.7973650313), (219.7739353592, 72.6910779015), (234.2126583936, 79.5847907717), (248.0000841339, 50.7073447029), (219.1226380652, 36.9199189626), align=None, mode=Mode.SUBTRACT)
    extrude(amount=-F13_DEPTH)


with BuildPart() as f13b:
    # F12 (on face) → F13, piece 2 (new body)
    with BuildSketch(Plane(origin=(0, 0, 0), x_dir=(0, -1, 0), z_dir=(-1, 0, 0))):
        Polygon((163.7317283517, 10.2348187258), (195.7508154323, 24.3691054968), (181.6165286613, 56.3881925774), (149.5974415807, 42.2539058064), align=None)
        Polygon((151.5754433172, 41.4874143645), (166.2127402683, 47.9488026027), (180.8500372194, 54.4101908409), (193.7728136958, 25.1355969386), (164.4982197935, 12.2128204623), align=None, mode=Mode.SUBTRACT)
    extrude(amount=-F13_DEPTH)


with BuildPart() as f13c:
    # F12 (on face) → F13, piece 3 (new body)
    with BuildSketch(Plane(origin=(0, 0, 0), x_dir=(0, -1, 0), z_dir=(-1, 0, 0))):
        Polygon((105.4247818059, -11.6600143596), (138.4254494527, 0), (126.7654350931, 33.0006676468), (93.7647674463, 21.3406532872), align=None)
        Polygon((95.6787966751, 20.4260538606), (110.7648161708, 25.7563461393), (125.8508356665, 31.0866384179), (136.5114202239, 0.9145994266), (106.3393812325, -9.7459851308), align=None, mode=Mode.SUBTRACT)
    extrude(amount=-F13_DEPTH)


with BuildPart() as f13d:
    # F12 (on face) → F13, piece 4 (new body)
    with BuildSketch(Plane(origin=(0, 0, 0), x_dir=(0, -1, 0), z_dir=(-1, 0, 0))):
        Polygon((47.200742599, -25.9916196732), (81.4227235681, -18.6529536807), (74.0840575757, 15.5690272884), (39.8620766065, 8.230361296), align=None)
        Polygon((41.6432471906, 7.0782192255), (57.2875813479, 10.4330379649), (72.9319155052, 13.7878567043), (79.641552984, -17.5008116103), (48.3528846694, -24.2104490891), align=None, mode=Mode.SUBTRACT)
    extrude(amount=-F13_DEPTH)


with BuildPart() as f23:
    # F22 (on face) → F23 (new body)
    with BuildSketch(Plane.YZ.offset(35)):
        with Locations((232.5, -504.5)):
            Rectangle(F22_W, F22_H)
        with Locations((232.5, -504.5)):
            Rectangle(F22_W_2, F22_H_2, mode=Mode.SUBTRACT)
    extrude(amount=F23_DEPTH)


with BuildPart() as f25:
    # F24 (on face) → F25 (new body)
    with BuildSketch(Plane.YZ.offset(35)):
        with Locations((-197.5, -504.5)):
            Rectangle(F24_W, F24_H)
        with Locations((-197.5, -504.5)):
            Rectangle(F24_W_2, F24_H_2, mode=Mode.SUBTRACT)
    extrude(amount=F25_DEPTH)


solid = Compound([f4_1_1.part, f1_1.part, f9.part, f11.part, f11b.part, f11c.part, f13.part, f13b.part, f13c.part, f13d.part, f23.part, f25.part])
